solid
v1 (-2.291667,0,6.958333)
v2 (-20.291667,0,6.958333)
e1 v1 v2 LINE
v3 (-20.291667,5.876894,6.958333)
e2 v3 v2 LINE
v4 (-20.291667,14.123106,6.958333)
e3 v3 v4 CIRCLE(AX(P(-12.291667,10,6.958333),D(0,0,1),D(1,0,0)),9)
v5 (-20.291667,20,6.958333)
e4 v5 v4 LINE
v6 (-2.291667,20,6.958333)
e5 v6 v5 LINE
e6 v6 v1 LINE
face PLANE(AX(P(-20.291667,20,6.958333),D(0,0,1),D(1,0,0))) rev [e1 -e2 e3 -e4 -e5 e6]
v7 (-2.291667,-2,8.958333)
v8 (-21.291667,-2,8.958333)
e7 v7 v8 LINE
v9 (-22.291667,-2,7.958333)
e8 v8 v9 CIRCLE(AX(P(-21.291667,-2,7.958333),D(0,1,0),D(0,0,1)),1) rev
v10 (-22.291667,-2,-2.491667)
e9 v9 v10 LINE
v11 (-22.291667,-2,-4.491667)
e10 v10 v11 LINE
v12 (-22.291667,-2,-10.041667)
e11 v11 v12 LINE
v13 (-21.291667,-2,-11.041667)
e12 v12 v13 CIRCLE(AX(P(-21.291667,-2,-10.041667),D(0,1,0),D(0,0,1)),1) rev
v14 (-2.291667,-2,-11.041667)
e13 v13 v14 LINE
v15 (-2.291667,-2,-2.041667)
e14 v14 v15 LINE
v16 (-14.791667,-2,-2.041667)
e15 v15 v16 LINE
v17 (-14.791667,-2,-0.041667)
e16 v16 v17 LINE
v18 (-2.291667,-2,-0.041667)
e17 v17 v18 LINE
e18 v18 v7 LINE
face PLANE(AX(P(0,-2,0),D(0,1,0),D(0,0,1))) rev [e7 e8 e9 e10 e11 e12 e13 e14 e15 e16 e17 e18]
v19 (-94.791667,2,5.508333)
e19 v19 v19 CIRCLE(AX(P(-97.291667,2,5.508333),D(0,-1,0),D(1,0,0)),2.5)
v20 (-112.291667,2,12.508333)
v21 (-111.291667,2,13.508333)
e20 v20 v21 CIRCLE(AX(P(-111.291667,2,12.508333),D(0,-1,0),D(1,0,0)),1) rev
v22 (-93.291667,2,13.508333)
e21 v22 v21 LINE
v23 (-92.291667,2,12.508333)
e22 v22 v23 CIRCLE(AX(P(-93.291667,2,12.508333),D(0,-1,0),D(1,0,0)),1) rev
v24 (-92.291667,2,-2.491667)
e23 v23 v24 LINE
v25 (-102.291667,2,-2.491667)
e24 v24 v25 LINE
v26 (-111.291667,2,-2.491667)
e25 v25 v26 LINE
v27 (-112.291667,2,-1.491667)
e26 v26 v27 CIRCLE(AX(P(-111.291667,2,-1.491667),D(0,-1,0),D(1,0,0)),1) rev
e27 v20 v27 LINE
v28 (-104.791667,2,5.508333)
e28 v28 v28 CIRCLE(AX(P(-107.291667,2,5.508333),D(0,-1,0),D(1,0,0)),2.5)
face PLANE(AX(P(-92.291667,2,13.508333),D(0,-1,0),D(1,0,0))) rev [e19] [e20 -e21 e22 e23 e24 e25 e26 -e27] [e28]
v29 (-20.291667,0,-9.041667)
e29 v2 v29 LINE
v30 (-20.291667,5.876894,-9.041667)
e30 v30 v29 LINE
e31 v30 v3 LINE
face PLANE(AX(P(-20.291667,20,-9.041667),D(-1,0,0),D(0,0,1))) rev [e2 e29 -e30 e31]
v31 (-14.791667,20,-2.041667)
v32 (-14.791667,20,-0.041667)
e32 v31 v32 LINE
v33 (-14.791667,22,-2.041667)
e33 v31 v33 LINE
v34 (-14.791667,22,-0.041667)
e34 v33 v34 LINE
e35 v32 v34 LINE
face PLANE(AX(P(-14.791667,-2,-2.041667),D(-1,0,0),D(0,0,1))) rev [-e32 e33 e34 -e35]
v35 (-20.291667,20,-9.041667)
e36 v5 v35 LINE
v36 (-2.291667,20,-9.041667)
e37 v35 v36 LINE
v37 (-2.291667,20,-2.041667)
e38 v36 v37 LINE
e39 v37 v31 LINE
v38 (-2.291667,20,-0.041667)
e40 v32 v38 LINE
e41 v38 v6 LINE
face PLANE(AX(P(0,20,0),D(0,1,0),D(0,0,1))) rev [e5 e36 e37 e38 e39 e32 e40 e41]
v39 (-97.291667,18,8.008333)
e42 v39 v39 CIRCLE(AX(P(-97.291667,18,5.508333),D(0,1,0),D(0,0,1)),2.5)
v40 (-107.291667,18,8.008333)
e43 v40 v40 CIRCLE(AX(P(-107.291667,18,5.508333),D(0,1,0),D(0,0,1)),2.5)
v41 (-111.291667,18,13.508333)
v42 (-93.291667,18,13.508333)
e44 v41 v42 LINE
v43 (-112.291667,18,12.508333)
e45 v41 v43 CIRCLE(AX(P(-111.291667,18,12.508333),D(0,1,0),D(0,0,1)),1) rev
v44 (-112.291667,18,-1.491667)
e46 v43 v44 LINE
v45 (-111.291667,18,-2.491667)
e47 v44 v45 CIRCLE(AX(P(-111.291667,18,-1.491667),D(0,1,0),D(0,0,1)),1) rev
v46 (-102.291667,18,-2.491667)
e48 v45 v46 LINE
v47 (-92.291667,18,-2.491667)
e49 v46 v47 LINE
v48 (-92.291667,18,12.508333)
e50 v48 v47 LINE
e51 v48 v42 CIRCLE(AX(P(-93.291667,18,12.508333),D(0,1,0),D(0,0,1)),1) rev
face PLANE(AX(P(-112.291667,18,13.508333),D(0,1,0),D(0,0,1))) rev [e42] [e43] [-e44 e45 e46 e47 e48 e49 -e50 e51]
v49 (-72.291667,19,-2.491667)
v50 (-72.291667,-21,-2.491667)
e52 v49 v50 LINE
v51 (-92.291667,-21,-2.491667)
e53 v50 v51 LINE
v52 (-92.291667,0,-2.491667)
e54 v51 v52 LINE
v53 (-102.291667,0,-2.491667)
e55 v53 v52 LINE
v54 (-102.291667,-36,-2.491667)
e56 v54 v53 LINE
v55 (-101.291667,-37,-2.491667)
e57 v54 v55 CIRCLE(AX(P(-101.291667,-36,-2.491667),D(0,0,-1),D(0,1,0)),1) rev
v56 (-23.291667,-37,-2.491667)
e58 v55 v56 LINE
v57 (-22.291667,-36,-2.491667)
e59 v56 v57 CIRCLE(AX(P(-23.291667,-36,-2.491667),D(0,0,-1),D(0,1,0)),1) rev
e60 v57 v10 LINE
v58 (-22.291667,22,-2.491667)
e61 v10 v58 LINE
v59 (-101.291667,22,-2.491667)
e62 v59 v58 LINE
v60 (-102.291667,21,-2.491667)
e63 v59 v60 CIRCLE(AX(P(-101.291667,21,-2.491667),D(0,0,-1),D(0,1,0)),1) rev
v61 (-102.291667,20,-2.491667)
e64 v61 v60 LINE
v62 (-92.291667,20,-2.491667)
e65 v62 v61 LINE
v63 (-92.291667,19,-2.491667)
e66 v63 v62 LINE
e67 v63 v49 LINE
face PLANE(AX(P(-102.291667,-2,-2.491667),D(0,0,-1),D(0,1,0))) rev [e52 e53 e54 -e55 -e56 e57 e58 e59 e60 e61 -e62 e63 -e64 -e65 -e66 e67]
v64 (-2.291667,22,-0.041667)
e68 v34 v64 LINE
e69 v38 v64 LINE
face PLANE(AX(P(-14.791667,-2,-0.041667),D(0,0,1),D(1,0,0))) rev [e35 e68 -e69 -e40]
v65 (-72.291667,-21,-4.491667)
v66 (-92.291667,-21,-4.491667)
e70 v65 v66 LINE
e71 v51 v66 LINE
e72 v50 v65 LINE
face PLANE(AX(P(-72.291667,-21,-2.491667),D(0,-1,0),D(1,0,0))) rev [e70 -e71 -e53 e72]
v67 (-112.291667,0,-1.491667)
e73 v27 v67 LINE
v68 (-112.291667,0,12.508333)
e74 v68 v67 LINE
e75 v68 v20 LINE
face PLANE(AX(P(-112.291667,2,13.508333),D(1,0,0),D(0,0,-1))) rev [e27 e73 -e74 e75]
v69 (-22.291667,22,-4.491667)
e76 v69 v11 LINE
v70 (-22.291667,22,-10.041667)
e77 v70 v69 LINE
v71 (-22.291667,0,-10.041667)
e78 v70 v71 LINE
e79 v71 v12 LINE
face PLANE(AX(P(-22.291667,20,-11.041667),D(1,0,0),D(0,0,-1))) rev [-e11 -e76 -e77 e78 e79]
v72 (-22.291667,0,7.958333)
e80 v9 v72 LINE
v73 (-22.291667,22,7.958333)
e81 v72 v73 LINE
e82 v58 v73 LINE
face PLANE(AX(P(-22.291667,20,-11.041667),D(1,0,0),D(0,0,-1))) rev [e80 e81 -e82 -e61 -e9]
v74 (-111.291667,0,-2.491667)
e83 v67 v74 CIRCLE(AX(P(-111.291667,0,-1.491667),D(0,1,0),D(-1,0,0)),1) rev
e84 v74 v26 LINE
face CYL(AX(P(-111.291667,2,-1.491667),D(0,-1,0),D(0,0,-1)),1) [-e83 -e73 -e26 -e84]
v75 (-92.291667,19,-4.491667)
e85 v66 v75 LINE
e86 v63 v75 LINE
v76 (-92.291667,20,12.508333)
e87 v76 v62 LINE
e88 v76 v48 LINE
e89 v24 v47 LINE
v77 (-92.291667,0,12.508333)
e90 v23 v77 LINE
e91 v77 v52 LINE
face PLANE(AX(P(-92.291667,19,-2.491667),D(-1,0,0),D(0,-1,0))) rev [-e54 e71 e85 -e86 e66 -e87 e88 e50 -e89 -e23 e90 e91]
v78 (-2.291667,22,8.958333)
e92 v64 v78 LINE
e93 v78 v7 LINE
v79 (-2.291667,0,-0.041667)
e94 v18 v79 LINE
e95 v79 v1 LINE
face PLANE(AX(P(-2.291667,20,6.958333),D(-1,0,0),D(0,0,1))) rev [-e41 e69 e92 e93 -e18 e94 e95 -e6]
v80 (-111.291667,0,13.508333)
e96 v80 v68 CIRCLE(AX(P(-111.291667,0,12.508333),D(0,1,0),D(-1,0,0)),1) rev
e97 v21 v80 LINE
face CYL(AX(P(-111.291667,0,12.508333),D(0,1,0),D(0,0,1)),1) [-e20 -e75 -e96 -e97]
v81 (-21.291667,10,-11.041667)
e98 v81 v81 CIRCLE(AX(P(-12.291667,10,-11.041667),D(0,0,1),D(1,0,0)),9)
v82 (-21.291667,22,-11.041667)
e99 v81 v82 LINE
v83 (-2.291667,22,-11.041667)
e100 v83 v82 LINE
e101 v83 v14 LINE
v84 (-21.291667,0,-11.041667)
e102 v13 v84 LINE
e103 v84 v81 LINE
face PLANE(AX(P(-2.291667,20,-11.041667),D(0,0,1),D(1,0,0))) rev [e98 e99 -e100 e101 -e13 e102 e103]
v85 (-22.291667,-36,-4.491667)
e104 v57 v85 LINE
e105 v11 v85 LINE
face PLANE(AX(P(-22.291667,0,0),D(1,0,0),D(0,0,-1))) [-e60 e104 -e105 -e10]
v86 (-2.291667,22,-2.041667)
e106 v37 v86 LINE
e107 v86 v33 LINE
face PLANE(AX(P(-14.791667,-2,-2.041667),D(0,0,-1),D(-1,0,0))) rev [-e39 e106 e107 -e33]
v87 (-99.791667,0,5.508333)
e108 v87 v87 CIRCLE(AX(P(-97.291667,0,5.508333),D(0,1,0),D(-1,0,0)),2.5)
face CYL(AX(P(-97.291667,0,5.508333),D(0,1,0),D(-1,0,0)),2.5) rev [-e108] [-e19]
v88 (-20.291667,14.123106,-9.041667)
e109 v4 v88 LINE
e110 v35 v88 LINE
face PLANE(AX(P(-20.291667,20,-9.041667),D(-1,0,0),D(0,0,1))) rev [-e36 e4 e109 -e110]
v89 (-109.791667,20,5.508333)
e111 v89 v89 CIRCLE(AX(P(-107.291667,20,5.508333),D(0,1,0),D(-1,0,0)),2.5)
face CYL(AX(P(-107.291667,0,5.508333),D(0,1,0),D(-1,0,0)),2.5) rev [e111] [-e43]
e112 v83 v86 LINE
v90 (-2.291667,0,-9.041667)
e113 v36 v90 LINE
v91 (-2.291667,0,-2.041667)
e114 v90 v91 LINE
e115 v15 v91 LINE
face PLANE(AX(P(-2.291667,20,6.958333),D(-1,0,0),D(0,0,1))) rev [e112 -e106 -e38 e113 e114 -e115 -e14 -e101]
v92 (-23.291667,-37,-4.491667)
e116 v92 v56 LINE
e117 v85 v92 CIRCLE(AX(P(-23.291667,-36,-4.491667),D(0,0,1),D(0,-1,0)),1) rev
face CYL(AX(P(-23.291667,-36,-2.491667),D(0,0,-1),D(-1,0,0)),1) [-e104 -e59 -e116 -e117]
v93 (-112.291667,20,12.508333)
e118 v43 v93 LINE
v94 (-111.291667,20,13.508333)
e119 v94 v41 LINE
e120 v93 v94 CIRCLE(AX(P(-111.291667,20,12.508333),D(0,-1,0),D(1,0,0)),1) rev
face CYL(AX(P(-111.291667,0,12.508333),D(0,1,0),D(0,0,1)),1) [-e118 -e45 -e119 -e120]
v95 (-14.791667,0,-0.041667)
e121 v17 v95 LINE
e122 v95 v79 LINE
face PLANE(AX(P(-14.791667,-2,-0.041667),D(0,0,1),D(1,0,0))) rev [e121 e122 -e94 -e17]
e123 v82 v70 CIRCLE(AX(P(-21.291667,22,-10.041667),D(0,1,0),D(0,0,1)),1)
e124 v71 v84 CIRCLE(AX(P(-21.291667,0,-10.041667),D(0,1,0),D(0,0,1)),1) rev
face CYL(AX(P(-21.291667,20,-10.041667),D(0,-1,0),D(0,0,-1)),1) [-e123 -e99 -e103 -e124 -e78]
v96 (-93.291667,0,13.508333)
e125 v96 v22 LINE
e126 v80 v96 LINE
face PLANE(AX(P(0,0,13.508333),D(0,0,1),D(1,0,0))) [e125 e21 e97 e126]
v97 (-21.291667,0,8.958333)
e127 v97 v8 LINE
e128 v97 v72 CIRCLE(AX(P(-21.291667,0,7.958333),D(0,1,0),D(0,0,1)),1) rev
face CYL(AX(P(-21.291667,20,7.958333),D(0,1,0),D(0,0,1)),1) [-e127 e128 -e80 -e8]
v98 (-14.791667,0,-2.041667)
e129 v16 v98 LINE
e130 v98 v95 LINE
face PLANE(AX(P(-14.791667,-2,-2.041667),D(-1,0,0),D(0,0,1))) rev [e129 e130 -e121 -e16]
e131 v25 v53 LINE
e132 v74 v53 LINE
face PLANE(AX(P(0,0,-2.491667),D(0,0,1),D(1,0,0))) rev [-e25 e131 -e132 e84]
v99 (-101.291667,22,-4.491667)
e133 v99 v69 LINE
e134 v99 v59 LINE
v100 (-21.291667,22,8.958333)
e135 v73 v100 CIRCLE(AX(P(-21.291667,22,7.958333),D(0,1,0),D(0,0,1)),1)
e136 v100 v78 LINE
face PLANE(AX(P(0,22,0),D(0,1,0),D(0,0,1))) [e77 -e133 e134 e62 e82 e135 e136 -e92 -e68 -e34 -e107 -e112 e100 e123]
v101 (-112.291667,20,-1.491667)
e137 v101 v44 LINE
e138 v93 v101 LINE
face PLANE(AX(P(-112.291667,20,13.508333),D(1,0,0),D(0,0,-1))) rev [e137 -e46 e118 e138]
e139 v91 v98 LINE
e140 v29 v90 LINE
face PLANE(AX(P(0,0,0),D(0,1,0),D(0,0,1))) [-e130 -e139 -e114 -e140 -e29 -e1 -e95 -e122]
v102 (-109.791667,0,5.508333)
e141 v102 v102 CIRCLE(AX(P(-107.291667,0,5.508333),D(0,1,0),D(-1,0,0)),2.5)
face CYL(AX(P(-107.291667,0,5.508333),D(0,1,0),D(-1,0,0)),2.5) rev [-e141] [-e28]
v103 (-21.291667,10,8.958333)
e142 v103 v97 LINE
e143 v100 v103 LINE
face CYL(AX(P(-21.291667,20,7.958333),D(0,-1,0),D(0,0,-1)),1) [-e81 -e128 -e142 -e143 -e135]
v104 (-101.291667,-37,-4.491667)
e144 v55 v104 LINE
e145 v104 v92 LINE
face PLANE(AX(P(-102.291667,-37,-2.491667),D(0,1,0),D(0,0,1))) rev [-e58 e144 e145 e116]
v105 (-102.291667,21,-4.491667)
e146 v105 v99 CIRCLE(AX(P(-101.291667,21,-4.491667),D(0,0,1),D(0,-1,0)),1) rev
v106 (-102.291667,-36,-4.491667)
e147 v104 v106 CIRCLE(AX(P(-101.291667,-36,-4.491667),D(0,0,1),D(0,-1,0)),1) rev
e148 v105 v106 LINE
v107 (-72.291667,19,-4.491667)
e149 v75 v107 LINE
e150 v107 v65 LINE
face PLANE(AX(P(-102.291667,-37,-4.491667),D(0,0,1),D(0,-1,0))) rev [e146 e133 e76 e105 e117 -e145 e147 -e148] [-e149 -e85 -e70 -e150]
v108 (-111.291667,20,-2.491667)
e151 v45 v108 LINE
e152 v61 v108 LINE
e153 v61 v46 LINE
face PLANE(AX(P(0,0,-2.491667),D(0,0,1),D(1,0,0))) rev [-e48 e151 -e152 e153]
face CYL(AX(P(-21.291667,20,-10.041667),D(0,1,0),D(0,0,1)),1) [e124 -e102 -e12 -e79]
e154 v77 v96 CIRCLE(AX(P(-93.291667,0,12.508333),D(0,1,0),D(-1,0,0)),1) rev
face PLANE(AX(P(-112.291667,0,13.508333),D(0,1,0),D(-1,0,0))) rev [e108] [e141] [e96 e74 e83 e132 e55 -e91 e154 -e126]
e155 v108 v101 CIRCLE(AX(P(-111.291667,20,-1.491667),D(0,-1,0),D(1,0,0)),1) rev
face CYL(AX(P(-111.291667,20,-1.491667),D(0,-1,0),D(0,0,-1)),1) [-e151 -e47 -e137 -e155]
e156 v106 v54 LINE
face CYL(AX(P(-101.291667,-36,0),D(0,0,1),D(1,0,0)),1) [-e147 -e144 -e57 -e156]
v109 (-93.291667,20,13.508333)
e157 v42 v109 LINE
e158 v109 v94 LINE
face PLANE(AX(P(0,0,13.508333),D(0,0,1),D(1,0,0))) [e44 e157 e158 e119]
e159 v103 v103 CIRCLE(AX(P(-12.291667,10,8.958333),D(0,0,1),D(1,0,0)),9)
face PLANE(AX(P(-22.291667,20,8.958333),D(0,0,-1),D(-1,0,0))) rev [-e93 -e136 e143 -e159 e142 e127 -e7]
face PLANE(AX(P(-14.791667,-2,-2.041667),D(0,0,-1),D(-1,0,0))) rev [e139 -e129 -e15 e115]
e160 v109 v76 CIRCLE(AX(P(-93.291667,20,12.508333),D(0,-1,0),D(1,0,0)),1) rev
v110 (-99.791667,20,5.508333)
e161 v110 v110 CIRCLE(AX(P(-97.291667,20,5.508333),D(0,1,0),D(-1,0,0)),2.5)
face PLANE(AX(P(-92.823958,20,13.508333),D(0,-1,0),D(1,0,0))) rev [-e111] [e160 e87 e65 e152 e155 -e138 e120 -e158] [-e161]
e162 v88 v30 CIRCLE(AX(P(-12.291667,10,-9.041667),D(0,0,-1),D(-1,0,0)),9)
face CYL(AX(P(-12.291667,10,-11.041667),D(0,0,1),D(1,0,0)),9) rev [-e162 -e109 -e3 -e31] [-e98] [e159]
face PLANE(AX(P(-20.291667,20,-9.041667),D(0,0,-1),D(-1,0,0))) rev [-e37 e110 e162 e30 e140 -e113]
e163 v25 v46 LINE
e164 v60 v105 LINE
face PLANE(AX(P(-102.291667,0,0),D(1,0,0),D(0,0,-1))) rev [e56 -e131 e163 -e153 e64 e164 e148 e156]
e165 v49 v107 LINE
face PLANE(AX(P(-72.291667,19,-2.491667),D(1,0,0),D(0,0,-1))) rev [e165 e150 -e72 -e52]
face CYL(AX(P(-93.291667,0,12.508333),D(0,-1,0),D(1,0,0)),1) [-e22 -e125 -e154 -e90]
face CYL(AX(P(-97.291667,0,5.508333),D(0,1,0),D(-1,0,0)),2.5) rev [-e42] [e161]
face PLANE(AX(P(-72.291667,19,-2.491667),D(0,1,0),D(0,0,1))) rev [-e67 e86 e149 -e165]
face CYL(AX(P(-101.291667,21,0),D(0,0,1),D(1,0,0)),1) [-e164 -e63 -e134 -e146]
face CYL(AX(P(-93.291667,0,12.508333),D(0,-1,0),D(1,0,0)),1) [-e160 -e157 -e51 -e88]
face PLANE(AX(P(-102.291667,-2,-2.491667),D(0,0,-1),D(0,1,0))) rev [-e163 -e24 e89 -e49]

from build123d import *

# Parameters (mm, degrees)
BOSS_EXTRUDE1_DEPTH = 20
FILLET1_R           = 1
SKETCH2_R           = 9
CUT_EXTRUDE1_DEPTH  = 20
BOSS_EXTRUDE2_START = 2
BOSS_EXTRUDE2_DEPTH = 2
SKETCH4_W           = 20
SKETCH4_H           = 20
BOSS_EXTRUDE3_DEPTH = 2
FILLET2_R           = 1
SKETCH5_W           = 12.5
SKETCH5_H           = 2
CUT_EXTRUDE2_DEPTH  = 24
BOSS_EXTRUDE4_DEPTH = 80
FILLET3_R           = 1
SKETCH8_R           = 7.11392485
SKETCH8_W           = 20
SKETCH8_H           = 40
CUT_EXTRUDE3_DEPTH  = 2
SKETCH9_W           = 20
SKETCH9_H           = 2
BOSS_EXTRUDE5_DEPTH = 16
FILLET4_R           = 1
SKETCH10_R          = 2.5
CUT_EXTRUDE4_DEPTH  = 20


with BuildPart() as part:
    # Sketch1 → Boss-Extrude1 (new body)
    with BuildSketch(Plane(origin=(0, 0, 0), x_dir=(1, 0, 0), z_dir=(0, 1, 0))):
        Polygon((-2.291666667, 11.041666667), (-22.291666667, 11.041666667), (-22.291666667, -8.958333333), (-2.291666667, -8.958333333), (-2.291666667, -6.958333333), (-20.291666667, -6.958333333), (-20.291666667, 9.041666667), (-2.291666667, 9.041666667), align=None)
    extrude(amount=BOSS_EXTRUDE1_DEPTH)

    # Fillet1
    fillet1_edges = [part.edges().sort_by_distance(p)[0] for p in [
        (-22.291666667, 10, 8.958333333),
        (-22.291666667, 10, -11.041666667),
    ]]
    fillet(fillet1_edges, radius=FILLET1_R)

    # Sketch2 → Cut-Extrude1 (cut)
    with BuildSketch(Plane.XY.offset(8.958333333)):
        with Locations(Location((-12.291666667, 10, 0), (0, 0, 180))):
            Circle(SKETCH2_R)
    extrude(amount=-CUT_EXTRUDE1_DEPTH, mode=Mode.SUBTRACT)

    # Sketch3 → Boss-Extrude2 (add)
    with BuildSketch(Plane(origin=(0, 20, 0), x_dir=(1, 0, 0), z_dir=(0, 1, 0)).offset(BOSS_EXTRUDE2_START)):
        Polygon((-2.291666667, 2.377848536), (-2.291666667, 9.041666667), (-20.291666667, 9.041666667), (-20.291666667, -6.958333333), (-2.291666667, -6.958333333), (-2.291666667, 0.377848536), align=None)
        with BuildLine():
            Line((-2.291666667, 9.041666667), (-2.291666667, 11.041666667))
            Line((-2.291666667, 11.041666667), (-21.291666667, 11.041666667))
            ThreePointArc((-21.291666667, 11.041666667), (-21.998773448, 10.748773448), (-22.291666667, 10.041666667))
            Line((-22.291666667, 10.041666667), (-22.291666667, -7.958333333))
            ThreePointArc((-22.291666667, -7.958333333), (-21.998773448, -8.665440115), (-21.291666667, -8.958333333))
            Line((-21.291666667, -8.958333333), (-2.291666667, -8.958333333))
            Line((-2.291666667, -8.958333333), (-2.291666667, -6.958333333))
            Line((-2.291666667, -6.958333333), (-20.291666667, -6.958333333))
            Line((-20.291666667, -6.958333333), (-20.291666667, 9.041666667))
            Line((-20.291666667, 9.041666667), (-2.291666667, 9.041666667))
        make_face()
    extrude(amount=-BOSS_EXTRUDE2_DEPTH)

    # Sketch4 → Boss-Extrude3 (add)
    with BuildSketch(Plane.XZ):
        with Locations((-12.291666667, -1.041666667)):
            Rectangle(SKETCH4_W, SKETCH4_H)
    extrude(amount=BOSS_EXTRUDE3_DEPTH)

    # Fillet2
    fillet2_edges = [part.edges().sort_by_distance(p)[0] for p in [
        (-22.291666667, -1, -11.041666667),
        (-22.291666667, -1, 8.958333333),
    ]]
    fillet(fillet2_edges, radius=FILLET2_R - 0.0001)  # a hair under: the kernel refuses the full size

    # Sketch5 → Cut-Extrude2 (cut)
    with BuildSketch(Plane(origin=(0, 22, 0), x_dir=(1, 0, 0), z_dir=(0, 1, 0))):
        with Locations((-8.541666667, 1.041666667)):
            Rectangle(SKETCH5_W, SKETCH5_H)
    extrude(amount=-CUT_EXTRUDE2_DEPTH, mode=Mode.SUBTRACT)

    # Sketch6 → Boss-Extrude4 (add)
    with BuildSketch(Plane.ZY.offset(22.291666667)):
        Polygon((-2.491666667, -37), (-4.491666667, -37), (-4.491666667, -2), (-4.491666667, 22), (-2.491666667, 22), (-2.491666667, -2), align=None)
    extrude(amount=BOSS_EXTRUDE4_DEPTH)

    # Fillet3
    fillet3_edges = [part.edges().sort_by_distance(p)[0] for p in [
        (-22.291666667, -37, -3.491666667),
        (-102.291666667, 22, -3.491666667),
        (-102.291666667, -37, -3.491666667),
    ]]
    fillet(fillet3_edges, radius=FILLET3_R)

    # Sketch8 → Cut-Extrude3 (cut)
    with BuildSketch(Plane(origin=(0, 0, -4.491666667), x_dir=(-1, 0, 0), z_dir=(0, 0, -1))):
        with Locations((12.291666667, 10)):
            Circle(SKETCH8_R)
        with Locations((82.291666667, -1)):
            Rectangle(SKETCH8_W, SKETCH8_H)
    extrude(amount=-CUT_EXTRUDE3_DEPTH, mode=Mode.SUBTRACT)

    # Sketch9 → Boss-Extrude5 (add)
    with BuildSketch(Plane.XY.offset(-2.491666667)):
        Polygon((-92.823958121, 20), (-112.291666667, 20), (-112.291666667, 18), (-92.291666667, 18), (-92.291666667, 20), align=None)
        with Locations((-102.291666667, 1)):
            Rectangle(SKETCH9_W, SKETCH9_H)
    extrude(amount=BOSS_EXTRUDE5_DEPTH)

    # Fillet4
    fillet4_edges = [part.edges().sort_by_distance(p)[0] for p in [
        (-112.291666667, 19, -2.491666667),
        (-112.291666667, 19, 13.508333333),
        (-92.291666667, 19, 13.508333333),
        (-112.291666667, 1, -2.491666667),
        (-92.291666667, 1, 13.508333333),
        (-112.291666667, 1, 13.508333333),
    ]]
    fillet(fillet4_edges, radius=FILLET4_R)

    # Sketch10 → Cut-Extrude4 (cut)
    with BuildSketch(Plane(origin=(0, 20, 0), x_dir=(1, 0, 0), z_dir=(0, 1, 0))):
        with Locations(Location((-97.291666667, -5.508333333, 0), (0, 0, 180))):
            Circle(SKETCH10_R)
        with Locations(Location((-107.291666667, -5.508333333, 0), (0, 0, 180))):
            Circle(SKETCH10_R)
    extrude(amount=-CUT_EXTRUDE4_DEPTH, mode=Mode.SUBTRACT)


solid = part.part
